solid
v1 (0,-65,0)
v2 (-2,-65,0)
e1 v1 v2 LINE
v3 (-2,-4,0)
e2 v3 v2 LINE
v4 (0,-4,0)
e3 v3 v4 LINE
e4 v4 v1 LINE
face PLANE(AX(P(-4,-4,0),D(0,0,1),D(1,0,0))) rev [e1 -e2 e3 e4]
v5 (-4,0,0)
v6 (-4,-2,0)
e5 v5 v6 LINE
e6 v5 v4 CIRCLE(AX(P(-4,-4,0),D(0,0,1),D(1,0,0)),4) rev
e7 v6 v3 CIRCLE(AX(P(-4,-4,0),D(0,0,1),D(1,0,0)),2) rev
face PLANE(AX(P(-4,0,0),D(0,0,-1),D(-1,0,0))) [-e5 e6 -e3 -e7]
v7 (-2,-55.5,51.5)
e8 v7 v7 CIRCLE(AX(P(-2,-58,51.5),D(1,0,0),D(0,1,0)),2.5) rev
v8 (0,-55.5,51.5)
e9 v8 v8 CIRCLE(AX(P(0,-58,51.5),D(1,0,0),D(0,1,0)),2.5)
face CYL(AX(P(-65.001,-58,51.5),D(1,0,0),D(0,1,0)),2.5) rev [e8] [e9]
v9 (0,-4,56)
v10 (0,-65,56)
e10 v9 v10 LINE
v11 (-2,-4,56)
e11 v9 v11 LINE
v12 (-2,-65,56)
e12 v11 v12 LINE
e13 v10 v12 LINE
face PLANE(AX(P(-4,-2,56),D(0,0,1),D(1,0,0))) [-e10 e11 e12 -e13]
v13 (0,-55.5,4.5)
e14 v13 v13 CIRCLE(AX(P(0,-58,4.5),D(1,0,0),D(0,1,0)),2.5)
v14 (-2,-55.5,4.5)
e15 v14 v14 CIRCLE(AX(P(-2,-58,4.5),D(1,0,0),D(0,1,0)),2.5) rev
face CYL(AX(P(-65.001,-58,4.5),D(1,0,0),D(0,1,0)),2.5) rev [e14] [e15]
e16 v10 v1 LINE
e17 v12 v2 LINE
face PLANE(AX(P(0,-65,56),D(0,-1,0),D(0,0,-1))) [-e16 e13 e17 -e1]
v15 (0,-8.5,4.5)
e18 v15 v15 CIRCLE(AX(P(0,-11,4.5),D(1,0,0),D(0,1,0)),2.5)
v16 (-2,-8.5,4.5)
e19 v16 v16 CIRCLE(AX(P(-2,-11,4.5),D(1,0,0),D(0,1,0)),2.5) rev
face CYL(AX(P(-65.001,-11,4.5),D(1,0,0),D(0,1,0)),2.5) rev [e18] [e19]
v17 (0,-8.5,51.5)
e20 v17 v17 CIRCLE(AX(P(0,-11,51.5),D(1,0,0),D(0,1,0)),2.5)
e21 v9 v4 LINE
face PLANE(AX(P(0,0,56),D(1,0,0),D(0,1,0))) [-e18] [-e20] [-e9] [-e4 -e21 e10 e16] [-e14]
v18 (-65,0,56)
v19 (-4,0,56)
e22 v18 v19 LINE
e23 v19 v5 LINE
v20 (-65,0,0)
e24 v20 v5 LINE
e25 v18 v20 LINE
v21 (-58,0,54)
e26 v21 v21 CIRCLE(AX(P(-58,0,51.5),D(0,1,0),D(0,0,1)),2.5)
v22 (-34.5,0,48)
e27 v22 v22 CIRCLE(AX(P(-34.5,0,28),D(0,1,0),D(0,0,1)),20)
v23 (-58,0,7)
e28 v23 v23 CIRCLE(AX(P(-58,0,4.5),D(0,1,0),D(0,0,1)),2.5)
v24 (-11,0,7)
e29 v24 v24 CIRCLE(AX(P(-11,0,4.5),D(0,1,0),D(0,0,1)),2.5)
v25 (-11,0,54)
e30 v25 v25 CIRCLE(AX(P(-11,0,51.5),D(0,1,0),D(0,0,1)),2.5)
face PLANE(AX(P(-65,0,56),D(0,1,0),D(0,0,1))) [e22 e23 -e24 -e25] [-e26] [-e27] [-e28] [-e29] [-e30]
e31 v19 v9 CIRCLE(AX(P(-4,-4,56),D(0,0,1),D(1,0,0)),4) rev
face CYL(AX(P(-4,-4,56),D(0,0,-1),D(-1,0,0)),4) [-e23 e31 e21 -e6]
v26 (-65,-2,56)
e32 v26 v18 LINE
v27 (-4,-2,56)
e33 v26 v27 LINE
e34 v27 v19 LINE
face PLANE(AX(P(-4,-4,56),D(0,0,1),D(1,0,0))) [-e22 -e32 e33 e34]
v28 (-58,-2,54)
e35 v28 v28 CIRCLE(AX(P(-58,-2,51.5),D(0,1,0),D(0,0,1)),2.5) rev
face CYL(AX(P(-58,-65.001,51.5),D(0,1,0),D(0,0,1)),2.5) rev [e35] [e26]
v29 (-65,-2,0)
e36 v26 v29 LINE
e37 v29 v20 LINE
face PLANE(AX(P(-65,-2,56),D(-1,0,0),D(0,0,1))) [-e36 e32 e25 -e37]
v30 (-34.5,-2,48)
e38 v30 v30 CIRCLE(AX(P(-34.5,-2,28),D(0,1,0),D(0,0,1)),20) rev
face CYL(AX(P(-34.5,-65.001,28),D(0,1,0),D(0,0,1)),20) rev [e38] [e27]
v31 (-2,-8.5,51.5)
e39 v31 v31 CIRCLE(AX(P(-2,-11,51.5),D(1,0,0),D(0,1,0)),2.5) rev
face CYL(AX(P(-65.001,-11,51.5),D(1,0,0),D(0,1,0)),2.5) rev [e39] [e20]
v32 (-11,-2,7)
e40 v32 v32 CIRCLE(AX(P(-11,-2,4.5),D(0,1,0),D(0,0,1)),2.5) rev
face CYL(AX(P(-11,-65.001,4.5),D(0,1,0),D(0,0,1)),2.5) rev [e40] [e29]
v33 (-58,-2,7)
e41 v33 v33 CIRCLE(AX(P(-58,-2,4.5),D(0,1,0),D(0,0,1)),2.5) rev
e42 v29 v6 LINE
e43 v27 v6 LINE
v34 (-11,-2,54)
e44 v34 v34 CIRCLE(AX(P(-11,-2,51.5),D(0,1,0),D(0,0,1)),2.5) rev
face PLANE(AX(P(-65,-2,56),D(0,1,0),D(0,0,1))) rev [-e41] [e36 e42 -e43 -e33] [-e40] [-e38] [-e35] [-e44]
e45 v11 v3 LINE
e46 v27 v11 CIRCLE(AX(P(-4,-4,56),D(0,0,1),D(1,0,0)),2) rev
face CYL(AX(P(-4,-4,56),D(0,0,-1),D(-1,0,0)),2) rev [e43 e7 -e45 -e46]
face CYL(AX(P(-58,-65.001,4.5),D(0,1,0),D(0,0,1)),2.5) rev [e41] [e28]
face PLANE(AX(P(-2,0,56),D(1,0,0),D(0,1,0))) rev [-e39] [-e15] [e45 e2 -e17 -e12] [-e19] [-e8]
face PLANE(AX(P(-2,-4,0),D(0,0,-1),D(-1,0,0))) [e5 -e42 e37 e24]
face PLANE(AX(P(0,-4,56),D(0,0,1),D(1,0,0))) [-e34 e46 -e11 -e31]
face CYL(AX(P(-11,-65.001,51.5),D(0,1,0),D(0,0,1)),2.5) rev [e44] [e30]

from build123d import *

# Parameters (mm, degrees)
T_LE_DE_BASE_PLI_E1_DEPTH = 56
ENL_V_MAT_EXTRU_1_REACH   = 109.638
ESQUISSE6_R               = 2.5
ESQUISSE6_R_2             = 20
ENL_V_MAT_EXTRU_2_REACH   = 109.638
ESQUISSE7_R               = 2.5


# Sheet-metal steps are written as plain solids
with BuildPart() as part:
    # Esquisse1 → Tôle de base pliée1 (new body)
    with BuildSketch(Plane.XY):
        with BuildLine():
            Line((-65, 0), (-4, 0))
            ThreePointArc((-4, 0), (-1.171572875, -1.171572875), (0, -4))
            Line((0, -4), (0, -65))
            Line((0, -65), (-2, -65))
            Line((-2, -65), (-2, -4))
            ThreePointArc((-2, -4), (-2.585786438, -2.585786438), (-4, -2))
            Line((-4, -2), (-65, -2))
            Line((-65, -2), (-65, 0))
        make_face()
    extrude(amount=T_LE_DE_BASE_PLI_E1_DEPTH)

    # Esquisse6 → Enlèv. mat.-Extru.1 (cut, up to next)
    with BuildSketch(Plane(origin=(0, 0, 0), x_dir=(1, 0, 0), z_dir=(0, 1, 0)), mode=Mode.PRIVATE) as enl_v_mat_extru_1_sk1:
        with Locations(Location((-58, -4.5, 0), (0, 0, 270))):
            Circle(ESQUISSE6_R)
    enl_v_mat_extru_1_tool1 = extrude(enl_v_mat_extru_1_sk1.sketch, amount=-ENL_V_MAT_EXTRU_1_REACH, mode=Mode.PRIVATE) & part.part
    # Esquisse6 → Enlèv. mat.-Extru.1 (cut, up to next)
    with BuildSketch(Plane(origin=(0, 0, 0), x_dir=(1, 0, 0), z_dir=(0, 1, 0)), mode=Mode.PRIVATE) as enl_v_mat_extru_1_sk2:
        with Locations(Location((-11, -4.5, 0), (0, 0, 270))):
            Circle(ESQUISSE6_R)
    enl_v_mat_extru_1_tool2 = extrude(enl_v_mat_extru_1_sk2.sketch, amount=-ENL_V_MAT_EXTRU_1_REACH, mode=Mode.PRIVATE) & part.part
    # Esquisse6 → Enlèv. mat.-Extru.1 (cut, up to next)
    with BuildSketch(Plane(origin=(0, 0, 0), x_dir=(1, 0, 0), z_dir=(0, 1, 0)), mode=Mode.PRIVATE) as enl_v_mat_extru_1_sk3:
        with Locations(Location((-11, -51.5, 0), (0, 0, 270))):
            Circle(ESQUISSE6_R)
    enl_v_mat_extru_1_tool3 = extrude(enl_v_mat_extru_1_sk3.sketch, amount=-ENL_V_MAT_EXTRU_1_REACH, mode=Mode.PRIVATE) & part.part
    # Esquisse6 → Enlèv. mat.-Extru.1 (cut, up to next)
    with BuildSketch(Plane(origin=(0, 0, 0), x_dir=(1, 0, 0), z_dir=(0, 1, 0)), mode=Mode.PRIVATE) as enl_v_mat_extru_1_sk4:
        with Locations(Location((-58, -51.5, 0), (0, 0, 270))):
            Circle(ESQUISSE6_R)
    enl_v_mat_extru_1_tool4 = extrude(enl_v_mat_extru_1_sk4.sketch, amount=-ENL_V_MAT_EXTRU_1_REACH, mode=Mode.PRIVATE) & part.part
    # Esquisse6 → Enlèv. mat.-Extru.1 (cut, up to next)
    with BuildSketch(Plane(origin=(0, 0, 0), x_dir=(1, 0, 0), z_dir=(0, 1, 0)), mode=Mode.PRIVATE) as enl_v_mat_extru_1_sk5:
        with Locations(Location((-34.5, -28, 0), (0, 0, 270))):
            Circle(ESQUISSE6_R_2)
    enl_v_mat_extru_1_tool5 = extrude(enl_v_mat_extru_1_sk5.sketch, amount=-ENL_V_MAT_EXTRU_1_REACH, mode=Mode.PRIVATE) & part.part
    add(enl_v_mat_extru_1_tool1.solids().sort_by_distance((-58, 0, 4.5))[0], mode=Mode.SUBTRACT)
    add(enl_v_mat_extru_1_tool2.solids().sort_by_distance((-11, 0, 4.5))[0], mode=Mode.SUBTRACT)
    add(enl_v_mat_extru_1_tool3.solids().sort_by_distance((-11, 0, 51.5))[0], mode=Mode.SUBTRACT)
    add(enl_v_mat_extru_1_tool4.solids().sort_by_distance((-58, 0, 51.5))[0], mode=Mode.SUBTRACT)
    add(enl_v_mat_extru_1_tool5.solids().sort_by_distance((-34.5, 0, 28))[0], mode=Mode.SUBTRACT)

    # Esquisse7 → Enlèv. mat.-Extru.2 (cut, up to next)
    with BuildSketch(Plane(origin=(0, 0, 0), x_dir=(0, 0, -1), z_dir=(1, 0, 0)), mode=Mode.PRIVATE) as enl_v_mat_extru_2_sk1:
        with Locations(Location((-4.5, -11, 0), (0, 0, 90))):
            Circle(ESQUISSE7_R)
    enl_v_mat_extru_2_tool1 = extrude(enl_v_mat_extru_2_sk1.sketch, amount=-ENL_V_MAT_EXTRU_2_REACH, mode=Mode.PRIVATE) & part.part
    # Esquisse7 → Enlèv. mat.-Extru.2 (cut, up to next)
    with BuildSketch(Plane(origin=(0, 0, 0), x_dir=(0, 0, -1), z_dir=(1, 0, 0)), mode=Mode.PRIVATE) as enl_v_mat_extru_2_sk2:
        with Locations(Location((-4.5, -58, 0), (0, 0, 90))):
            Circle(ESQUISSE7_R)
    enl_v_mat_extru_2_tool2 = extrude(enl_v_mat_extru_2_sk2.sketch, amount=-ENL_V_MAT_EXTRU_2_REACH, mode=Mode.PRIVATE) & part.part
    # Esquisse7 → Enlèv. mat.-Extru.2 (cut, up to next)
    with BuildSketch(Plane(origin=(0, 0, 0), x_dir=(0, 0, -1), z_dir=(1, 0, 0)), mode=Mode.PRIVATE) as enl_v_mat_extru_2_sk3:
        with Locations(Location((-51.5, -58, 0), (0, 0, 90))):
            Circle(ESQUISSE7_R)
    enl_v_mat_extru_2_tool3 = extrude(enl_v_mat_extru_2_sk3.sketch, amount=-ENL_V_MAT_EXTRU_2_REACH, mode=Mode.PRIVATE) & part.part
    # Esquisse7 → Enlèv. mat.-Extru.2 (cut, up to next)
    with BuildSketch(Plane(origin=(0, 0, 0), x_dir=(0, 0, -1), z_dir=(1, 0, 0)), mode=Mode.PRIVATE) as enl_v_mat_extru_2_sk4:
        with Locations(Location((-51.5, -11, 0), (0, 0, 90))):
            Circle(ESQUISSE7_R)
    enl_v_mat_extru_2_tool4 = extrude(enl_v_mat_extru_2_sk4.sketch, amount=-ENL_V_MAT_EXTRU_2_REACH, mode=Mode.PRIVATE) & part.part
    add(enl_v_mat_extru_2_tool1.solids().sort_by_distance((0, -11, 4.5))[0], mode=Mode.SUBTRACT)
    add(enl_v_mat_extru_2_tool2.solids().sort_by_distance((0, -58, 4.5))[0], mode=Mode.SUBTRACT)
    add(enl_v_mat_extru_2_tool3.solids().sort_by_distance((0, -58, 51.5))[0], mode=Mode.SUBTRACT)
    add(enl_v_mat_extru_2_tool4.solids().sort_by_distance((0, -11, 51.5))[0], mode=Mode.SUBTRACT)


solid = part.part
